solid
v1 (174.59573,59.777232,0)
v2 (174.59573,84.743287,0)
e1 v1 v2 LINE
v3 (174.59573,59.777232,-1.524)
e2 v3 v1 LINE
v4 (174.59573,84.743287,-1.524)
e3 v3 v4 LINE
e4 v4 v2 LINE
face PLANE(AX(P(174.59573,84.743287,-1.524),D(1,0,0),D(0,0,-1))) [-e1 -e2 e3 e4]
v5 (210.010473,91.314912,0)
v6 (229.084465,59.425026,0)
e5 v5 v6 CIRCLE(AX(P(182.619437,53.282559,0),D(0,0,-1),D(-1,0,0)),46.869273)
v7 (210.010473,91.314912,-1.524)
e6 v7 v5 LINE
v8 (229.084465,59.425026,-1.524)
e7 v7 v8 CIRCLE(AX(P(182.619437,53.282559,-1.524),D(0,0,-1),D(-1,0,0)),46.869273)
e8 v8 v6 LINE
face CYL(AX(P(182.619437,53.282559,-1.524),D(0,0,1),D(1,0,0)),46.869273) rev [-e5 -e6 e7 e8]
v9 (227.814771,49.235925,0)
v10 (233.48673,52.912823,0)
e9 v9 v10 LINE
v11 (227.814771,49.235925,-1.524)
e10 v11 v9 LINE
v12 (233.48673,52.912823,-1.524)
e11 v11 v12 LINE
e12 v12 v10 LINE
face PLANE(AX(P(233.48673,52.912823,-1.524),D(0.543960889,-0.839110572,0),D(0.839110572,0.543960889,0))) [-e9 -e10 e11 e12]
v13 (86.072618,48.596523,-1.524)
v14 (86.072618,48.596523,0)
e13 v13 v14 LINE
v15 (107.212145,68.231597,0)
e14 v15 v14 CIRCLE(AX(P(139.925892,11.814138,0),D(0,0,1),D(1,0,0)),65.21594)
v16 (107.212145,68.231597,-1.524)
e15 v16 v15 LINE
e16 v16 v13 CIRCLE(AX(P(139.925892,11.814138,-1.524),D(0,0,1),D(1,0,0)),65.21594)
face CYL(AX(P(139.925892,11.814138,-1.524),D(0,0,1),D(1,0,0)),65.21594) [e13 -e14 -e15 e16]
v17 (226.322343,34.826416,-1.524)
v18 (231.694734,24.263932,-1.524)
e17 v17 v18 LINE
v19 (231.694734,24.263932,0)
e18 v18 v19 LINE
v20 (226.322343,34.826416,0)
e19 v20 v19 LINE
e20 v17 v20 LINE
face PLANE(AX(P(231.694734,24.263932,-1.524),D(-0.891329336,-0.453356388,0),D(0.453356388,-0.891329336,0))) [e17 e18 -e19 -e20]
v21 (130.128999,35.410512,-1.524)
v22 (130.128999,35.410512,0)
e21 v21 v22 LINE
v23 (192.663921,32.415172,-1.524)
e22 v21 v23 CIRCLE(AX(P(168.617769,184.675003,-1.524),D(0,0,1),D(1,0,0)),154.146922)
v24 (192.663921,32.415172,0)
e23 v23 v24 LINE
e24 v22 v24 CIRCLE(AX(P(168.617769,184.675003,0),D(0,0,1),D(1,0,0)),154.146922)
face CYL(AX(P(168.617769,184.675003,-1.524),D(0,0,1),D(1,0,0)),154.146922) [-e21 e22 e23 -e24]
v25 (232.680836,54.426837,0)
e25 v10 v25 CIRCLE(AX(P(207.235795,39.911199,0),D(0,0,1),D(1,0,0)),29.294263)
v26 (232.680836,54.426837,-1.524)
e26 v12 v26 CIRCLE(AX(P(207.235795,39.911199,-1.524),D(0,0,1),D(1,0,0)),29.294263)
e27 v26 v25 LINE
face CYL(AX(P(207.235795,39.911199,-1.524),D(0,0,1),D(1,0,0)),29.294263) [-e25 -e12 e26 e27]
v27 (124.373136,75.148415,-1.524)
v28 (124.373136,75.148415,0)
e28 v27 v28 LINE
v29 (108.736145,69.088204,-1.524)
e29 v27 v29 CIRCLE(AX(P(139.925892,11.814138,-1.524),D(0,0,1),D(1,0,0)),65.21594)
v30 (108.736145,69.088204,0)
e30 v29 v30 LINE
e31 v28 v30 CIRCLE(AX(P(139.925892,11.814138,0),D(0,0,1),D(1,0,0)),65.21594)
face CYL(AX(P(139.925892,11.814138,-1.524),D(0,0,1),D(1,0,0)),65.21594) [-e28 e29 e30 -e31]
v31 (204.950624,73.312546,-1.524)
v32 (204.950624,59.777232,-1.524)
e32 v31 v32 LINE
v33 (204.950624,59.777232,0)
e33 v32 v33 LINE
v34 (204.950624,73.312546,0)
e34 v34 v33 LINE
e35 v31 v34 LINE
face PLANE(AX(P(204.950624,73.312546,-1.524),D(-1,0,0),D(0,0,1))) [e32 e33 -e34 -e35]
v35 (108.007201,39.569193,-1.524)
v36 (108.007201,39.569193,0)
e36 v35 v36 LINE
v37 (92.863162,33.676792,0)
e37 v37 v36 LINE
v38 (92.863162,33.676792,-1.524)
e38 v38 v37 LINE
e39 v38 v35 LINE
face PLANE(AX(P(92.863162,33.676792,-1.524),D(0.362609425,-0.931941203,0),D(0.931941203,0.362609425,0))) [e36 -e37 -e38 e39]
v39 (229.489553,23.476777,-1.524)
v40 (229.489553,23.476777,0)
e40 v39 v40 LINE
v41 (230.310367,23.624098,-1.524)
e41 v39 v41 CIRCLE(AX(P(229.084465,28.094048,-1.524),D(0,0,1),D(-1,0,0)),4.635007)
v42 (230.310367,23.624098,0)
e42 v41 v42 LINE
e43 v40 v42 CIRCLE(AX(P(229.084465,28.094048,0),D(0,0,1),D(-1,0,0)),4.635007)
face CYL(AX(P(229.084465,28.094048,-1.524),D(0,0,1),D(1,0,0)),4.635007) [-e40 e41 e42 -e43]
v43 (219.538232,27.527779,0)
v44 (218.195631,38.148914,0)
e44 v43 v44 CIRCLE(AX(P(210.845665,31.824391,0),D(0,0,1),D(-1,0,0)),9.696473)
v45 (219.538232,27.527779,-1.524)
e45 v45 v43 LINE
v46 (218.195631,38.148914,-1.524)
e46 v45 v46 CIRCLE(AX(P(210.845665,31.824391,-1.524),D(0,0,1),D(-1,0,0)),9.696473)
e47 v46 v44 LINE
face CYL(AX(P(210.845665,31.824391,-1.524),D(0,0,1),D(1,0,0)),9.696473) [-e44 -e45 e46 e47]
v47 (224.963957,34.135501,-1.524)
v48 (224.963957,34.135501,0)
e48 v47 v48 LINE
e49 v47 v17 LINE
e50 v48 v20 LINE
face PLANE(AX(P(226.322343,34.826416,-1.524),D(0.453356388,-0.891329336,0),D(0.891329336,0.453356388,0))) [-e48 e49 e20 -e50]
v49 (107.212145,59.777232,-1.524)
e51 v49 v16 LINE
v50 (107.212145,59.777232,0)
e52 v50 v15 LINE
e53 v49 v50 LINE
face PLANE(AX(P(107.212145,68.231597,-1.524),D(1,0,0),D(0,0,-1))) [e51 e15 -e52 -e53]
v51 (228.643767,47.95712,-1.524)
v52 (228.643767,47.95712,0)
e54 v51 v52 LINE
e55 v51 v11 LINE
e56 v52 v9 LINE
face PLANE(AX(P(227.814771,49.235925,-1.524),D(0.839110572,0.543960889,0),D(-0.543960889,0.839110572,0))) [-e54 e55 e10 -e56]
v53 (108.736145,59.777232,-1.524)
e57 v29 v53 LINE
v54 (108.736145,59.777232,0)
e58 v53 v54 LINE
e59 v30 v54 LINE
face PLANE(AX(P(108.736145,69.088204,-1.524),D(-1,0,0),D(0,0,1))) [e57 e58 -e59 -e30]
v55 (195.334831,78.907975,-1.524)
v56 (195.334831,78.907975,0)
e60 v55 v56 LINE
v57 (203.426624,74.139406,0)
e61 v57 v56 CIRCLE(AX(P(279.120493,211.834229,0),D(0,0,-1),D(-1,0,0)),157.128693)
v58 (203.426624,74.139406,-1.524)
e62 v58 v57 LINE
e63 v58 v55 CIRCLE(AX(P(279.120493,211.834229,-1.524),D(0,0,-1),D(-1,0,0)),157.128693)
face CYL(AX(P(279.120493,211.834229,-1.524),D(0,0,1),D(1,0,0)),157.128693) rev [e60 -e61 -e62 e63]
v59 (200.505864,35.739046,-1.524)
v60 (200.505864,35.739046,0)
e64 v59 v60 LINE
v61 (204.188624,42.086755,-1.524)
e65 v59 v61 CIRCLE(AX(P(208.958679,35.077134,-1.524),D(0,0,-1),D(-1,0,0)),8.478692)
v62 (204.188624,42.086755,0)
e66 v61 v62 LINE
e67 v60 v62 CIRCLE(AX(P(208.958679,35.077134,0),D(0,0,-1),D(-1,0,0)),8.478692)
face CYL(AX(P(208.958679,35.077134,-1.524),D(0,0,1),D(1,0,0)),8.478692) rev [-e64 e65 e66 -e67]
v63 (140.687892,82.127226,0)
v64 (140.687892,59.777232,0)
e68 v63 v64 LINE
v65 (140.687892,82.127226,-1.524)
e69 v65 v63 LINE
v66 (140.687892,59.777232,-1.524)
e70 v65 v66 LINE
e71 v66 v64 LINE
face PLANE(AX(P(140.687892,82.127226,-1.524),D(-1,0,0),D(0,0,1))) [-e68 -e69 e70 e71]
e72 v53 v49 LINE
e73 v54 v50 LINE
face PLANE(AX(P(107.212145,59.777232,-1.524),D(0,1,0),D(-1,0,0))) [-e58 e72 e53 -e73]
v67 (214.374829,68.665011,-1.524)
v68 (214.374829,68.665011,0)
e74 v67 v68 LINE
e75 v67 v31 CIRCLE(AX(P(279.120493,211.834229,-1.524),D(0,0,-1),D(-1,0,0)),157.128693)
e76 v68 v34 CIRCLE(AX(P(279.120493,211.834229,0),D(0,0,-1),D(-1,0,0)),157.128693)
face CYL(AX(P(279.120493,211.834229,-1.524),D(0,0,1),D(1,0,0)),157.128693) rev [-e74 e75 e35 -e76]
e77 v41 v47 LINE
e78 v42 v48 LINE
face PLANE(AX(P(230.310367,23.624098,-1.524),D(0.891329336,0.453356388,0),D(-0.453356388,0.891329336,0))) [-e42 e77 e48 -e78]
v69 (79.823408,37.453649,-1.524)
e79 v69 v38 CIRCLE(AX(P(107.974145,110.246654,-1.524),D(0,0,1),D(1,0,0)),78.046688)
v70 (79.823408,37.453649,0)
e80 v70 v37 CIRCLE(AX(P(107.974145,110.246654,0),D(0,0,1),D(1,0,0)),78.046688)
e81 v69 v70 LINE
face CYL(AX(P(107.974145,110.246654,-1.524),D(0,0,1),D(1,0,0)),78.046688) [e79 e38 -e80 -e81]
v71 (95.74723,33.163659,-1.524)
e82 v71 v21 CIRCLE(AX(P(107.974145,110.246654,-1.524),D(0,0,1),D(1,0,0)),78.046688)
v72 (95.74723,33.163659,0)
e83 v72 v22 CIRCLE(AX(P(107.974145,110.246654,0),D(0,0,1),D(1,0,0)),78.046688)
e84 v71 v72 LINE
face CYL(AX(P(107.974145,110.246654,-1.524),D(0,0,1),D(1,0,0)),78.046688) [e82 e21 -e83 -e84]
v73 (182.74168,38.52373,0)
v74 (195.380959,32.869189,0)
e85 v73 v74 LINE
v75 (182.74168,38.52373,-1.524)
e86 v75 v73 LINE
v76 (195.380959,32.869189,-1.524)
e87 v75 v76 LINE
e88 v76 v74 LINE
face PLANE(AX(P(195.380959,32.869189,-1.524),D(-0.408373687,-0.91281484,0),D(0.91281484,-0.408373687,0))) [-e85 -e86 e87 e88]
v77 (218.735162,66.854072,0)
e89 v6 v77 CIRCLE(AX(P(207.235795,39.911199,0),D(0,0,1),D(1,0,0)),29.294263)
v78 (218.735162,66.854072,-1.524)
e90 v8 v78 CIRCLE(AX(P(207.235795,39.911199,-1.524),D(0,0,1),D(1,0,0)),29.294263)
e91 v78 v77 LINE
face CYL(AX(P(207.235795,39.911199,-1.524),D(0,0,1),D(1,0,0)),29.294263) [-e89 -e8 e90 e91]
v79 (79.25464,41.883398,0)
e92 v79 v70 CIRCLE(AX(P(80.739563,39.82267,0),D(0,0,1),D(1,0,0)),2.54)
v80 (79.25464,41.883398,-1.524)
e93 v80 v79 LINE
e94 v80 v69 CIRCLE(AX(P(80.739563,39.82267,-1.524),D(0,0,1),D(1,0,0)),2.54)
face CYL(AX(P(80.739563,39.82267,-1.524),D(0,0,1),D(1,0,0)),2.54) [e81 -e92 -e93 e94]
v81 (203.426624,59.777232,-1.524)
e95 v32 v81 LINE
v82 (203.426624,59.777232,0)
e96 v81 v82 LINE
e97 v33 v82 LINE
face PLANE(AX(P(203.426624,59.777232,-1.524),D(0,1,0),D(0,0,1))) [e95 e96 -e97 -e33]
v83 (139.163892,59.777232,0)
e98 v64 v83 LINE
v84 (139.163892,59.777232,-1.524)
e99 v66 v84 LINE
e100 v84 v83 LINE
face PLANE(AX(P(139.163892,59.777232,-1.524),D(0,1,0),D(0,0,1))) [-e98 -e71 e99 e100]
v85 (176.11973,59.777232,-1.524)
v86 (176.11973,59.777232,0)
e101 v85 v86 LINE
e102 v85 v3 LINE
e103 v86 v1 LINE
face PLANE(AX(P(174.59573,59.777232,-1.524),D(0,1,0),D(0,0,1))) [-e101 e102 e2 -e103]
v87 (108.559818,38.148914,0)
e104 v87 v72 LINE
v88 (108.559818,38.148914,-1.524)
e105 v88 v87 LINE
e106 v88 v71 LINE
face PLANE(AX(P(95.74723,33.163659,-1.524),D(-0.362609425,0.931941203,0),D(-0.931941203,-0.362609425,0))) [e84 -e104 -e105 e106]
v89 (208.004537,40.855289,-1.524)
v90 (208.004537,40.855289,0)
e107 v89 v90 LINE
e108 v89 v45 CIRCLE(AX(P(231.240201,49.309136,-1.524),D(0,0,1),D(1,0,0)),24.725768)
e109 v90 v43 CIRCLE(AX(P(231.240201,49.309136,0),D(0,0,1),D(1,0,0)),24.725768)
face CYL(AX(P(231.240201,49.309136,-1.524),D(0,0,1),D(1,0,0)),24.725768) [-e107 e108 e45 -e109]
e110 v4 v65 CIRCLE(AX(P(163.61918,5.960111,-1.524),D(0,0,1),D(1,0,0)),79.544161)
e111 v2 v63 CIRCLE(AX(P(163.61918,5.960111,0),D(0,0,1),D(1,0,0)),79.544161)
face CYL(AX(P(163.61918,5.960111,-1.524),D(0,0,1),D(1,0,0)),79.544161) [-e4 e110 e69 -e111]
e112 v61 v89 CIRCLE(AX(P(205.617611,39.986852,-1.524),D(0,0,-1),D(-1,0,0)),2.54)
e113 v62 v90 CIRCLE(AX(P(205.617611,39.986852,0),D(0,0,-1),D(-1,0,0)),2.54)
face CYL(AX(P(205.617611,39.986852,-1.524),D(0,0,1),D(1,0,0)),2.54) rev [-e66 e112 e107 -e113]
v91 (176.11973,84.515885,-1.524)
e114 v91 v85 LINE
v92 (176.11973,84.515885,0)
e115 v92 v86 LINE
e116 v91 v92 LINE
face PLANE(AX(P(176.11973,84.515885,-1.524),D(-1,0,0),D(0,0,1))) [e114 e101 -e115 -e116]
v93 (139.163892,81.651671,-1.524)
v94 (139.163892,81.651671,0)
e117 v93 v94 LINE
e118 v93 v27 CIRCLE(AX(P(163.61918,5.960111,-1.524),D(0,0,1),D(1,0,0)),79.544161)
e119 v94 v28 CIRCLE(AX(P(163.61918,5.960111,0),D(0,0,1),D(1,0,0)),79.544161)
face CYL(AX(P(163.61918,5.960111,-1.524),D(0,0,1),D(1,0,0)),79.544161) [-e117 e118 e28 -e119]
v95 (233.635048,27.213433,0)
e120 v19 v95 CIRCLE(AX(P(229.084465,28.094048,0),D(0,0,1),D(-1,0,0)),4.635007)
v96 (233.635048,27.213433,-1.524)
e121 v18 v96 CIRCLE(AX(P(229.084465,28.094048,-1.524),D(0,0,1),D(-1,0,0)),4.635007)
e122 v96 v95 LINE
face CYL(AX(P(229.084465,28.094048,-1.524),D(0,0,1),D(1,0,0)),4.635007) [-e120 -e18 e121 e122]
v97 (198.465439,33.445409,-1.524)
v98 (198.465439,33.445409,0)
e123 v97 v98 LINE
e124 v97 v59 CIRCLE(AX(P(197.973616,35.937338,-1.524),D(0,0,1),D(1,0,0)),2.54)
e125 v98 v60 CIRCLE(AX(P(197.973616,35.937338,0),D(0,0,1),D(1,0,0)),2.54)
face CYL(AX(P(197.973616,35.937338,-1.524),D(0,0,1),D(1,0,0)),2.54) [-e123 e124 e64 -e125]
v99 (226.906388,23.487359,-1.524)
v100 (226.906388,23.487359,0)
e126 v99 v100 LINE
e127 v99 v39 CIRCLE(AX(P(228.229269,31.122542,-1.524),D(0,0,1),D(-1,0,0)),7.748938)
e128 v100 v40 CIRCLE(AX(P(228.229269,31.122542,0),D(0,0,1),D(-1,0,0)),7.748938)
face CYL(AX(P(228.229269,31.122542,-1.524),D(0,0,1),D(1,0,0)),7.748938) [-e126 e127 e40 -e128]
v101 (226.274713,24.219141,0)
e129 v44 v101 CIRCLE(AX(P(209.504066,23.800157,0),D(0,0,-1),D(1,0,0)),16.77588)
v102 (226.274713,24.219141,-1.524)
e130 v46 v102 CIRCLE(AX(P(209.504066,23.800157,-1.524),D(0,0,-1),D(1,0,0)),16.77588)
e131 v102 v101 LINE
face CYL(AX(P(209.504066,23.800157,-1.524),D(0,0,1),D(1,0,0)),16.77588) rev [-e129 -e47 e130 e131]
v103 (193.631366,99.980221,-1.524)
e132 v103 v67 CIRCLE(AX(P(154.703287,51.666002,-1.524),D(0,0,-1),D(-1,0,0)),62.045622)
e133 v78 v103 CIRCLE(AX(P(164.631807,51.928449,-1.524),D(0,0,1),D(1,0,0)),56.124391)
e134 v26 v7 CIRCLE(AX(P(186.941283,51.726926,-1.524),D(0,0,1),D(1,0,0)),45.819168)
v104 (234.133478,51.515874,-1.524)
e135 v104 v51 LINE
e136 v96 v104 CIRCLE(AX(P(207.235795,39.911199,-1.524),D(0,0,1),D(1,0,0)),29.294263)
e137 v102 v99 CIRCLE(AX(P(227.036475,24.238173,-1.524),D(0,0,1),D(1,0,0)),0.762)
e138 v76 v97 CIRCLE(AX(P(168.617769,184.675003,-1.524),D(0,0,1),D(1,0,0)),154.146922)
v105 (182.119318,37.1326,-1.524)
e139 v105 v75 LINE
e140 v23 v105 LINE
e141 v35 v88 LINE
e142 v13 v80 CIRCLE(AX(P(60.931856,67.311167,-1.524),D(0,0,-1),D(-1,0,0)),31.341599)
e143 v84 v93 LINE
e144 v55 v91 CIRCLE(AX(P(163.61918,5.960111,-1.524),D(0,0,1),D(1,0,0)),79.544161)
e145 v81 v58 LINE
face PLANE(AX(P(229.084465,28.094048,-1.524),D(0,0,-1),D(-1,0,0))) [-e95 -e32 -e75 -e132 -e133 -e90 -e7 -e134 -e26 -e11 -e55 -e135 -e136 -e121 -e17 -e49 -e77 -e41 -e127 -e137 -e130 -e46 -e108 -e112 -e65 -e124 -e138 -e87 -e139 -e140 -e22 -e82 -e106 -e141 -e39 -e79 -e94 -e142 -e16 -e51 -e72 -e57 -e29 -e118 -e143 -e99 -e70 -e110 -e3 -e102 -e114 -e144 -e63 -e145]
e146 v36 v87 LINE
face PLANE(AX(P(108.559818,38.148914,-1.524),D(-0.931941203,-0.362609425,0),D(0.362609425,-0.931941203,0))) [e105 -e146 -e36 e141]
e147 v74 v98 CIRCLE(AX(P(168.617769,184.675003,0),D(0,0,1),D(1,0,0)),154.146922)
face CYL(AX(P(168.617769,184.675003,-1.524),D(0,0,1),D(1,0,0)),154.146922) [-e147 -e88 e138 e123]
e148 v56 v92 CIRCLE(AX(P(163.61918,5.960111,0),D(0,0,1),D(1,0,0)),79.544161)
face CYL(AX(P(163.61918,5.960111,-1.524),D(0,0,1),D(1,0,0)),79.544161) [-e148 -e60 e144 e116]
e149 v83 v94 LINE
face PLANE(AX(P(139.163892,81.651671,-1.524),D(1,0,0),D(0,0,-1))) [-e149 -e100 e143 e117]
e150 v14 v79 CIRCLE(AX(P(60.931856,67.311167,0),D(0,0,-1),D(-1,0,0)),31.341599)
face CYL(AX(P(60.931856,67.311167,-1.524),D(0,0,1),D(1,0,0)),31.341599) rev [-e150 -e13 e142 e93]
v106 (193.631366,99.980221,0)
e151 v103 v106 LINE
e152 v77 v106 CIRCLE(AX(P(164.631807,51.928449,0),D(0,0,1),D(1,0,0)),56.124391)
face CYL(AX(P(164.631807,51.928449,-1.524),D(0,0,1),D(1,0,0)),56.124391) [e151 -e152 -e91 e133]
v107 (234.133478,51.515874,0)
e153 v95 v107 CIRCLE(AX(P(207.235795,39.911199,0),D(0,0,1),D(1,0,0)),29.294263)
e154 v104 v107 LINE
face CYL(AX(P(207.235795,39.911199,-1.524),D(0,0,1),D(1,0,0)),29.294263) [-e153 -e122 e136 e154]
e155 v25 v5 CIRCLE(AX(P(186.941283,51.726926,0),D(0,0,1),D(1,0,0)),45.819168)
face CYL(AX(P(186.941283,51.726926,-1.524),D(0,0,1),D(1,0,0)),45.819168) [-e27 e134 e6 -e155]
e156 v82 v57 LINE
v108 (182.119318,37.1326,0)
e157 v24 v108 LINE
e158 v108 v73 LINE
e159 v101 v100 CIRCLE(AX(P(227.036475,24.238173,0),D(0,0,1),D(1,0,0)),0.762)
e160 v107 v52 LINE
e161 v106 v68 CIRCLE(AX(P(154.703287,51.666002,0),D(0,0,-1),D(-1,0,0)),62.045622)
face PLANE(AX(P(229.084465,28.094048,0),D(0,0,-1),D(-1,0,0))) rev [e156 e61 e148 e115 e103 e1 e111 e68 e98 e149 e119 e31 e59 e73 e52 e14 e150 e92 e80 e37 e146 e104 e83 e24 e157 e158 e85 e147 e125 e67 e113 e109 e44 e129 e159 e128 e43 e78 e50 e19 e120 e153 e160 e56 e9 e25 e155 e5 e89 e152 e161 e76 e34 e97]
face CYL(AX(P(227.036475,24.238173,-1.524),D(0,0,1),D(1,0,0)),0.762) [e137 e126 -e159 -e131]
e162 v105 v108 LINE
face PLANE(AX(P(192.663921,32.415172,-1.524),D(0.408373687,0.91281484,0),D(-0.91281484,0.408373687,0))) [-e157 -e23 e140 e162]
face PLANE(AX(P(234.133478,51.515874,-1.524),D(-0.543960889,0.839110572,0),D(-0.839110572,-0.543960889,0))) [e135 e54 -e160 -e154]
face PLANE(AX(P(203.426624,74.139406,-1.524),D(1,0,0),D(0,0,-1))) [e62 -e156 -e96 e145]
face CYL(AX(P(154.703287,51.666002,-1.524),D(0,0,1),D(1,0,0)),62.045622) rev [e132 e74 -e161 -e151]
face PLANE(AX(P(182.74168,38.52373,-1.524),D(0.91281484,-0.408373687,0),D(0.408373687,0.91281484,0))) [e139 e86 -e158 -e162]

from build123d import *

# Parameters (mm, degrees)
BASE_FLANGE1_DEPTH = 1.524


# Sheet-metal steps are written as plain solids
with BuildPart() as part:
    # Sketch1 → Base-Flange1 (new body)
    with BuildSketch(Plane.XY):
        with BuildLine():
            Line((231.694733782, 24.263932463), (226.322343195, 34.826415896))
            Line((226.322343195, 34.826415896), (224.963957286, 34.135500761))
            Line((224.963957286, 34.135500761), (230.310366707, 23.62409806))
            ThreePointArc((230.310366707, 23.62409806), (229.903279587, 23.531939933), (229.489552508, 23.476777012))
            ThreePointArc((229.489552508, 23.476777012), (228.197526273, 23.373669283), (226.906388141, 23.487358857))
            ThreePointArc((226.906388141, 23.487358857), (226.4596517, 23.740258206), (226.274712745, 24.219141398))
            ThreePointArc((226.274712745, 24.219141398), (224.015809297, 32.216773888), (218.195630565, 38.14891429))
            ThreePointArc((218.195630565, 38.14891429), (220.465583992, 33.0404298), (219.538231847, 27.527778863))
            ThreePointArc((219.538231847, 27.527778863), (216.207783845, 29.677782654), (213.263726879, 32.332387856))
            ThreePointArc((213.263726879, 32.332387856), (210.198099549, 36.324777472), (208.004537358, 40.855288557))
            ThreePointArc((208.004537358, 40.855288557), (206.39770053, 42.404093827), (204.188624103, 42.08675537))
            ThreePointArc((204.188624103, 42.08675537), (201.624892341, 39.331988443), (200.505863828, 35.739045838))
            ThreePointArc((200.505863828, 35.739045838), (199.871363088, 34.249097505), (198.465439283, 33.445408832))
            ThreePointArc((198.465439283, 33.445408832), (196.924665159, 33.149450023), (195.38095855, 32.869188678))
            Line((195.38095855, 32.869188678), (182.741679906, 38.523729549))
            Line((182.741679906, 38.523729549), (182.119318407, 37.132599733))
            Line((182.119318407, 37.132599733), (192.663920738, 32.415171901))
            ThreePointArc((192.663920738, 32.415171901), (161.242789348, 30.704605569), (130.128998565, 35.41051229))
            ThreePointArc((130.128998565, 35.41051229), (113.063651794, 32.366088022), (95.747230087, 33.163658602))
            Line((95.747230087, 33.163658602), (108.559818137, 38.14891429))
            Line((108.559818137, 38.14891429), (108.007201374, 39.569192683))
            Line((108.007201374, 39.569192683), (92.863162197, 33.67679162))
            ThreePointArc((92.863162197, 33.67679162), (86.261009295, 35.281159538), (79.823408008, 37.453648673))
            ThreePointArc((79.823408008, 37.453648673), (78.22024482, 39.499195708), (79.254639852, 41.883398257))
            ThreePointArc((79.254639852, 41.883398257), (82.921318742, 44.978245875), (86.072618329, 48.596522643))
            ThreePointArc((86.072618329, 48.596522643), (95.542941515, 59.597739927), (107.212145233, 68.231596978))
            Line((107.212145233, 68.231596978), (107.212145233, 59.777231813))
            Line((107.212145233, 59.777231813), (108.736145233, 59.777231813))
            Line((108.736145233, 59.777231813), (108.736145233, 69.088203695))
            ThreePointArc((108.736145233, 69.088203695), (116.359031122, 72.623035129), (124.373136037, 75.148415287))
            ThreePointArc((124.373136037, 75.148415287), (131.602965043, 78.776561047), (139.163891612, 81.651671224))
            Line((139.163891612, 81.651671224), (139.163891612, 59.777231813))
            Line((139.163891612, 59.777231813), (140.687891612, 59.777231813))
            Line((140.687891612, 59.777231813), (140.687891612, 82.127226165))
            ThreePointArc((140.687891612, 82.127226165), (157.500365841, 85.268581792), (174.595729834, 84.743286803))
            Line((174.595729834, 84.743286803), (174.595729834, 59.777231813))
            Line((174.595729834, 59.777231813), (176.119729834, 59.777231813))
            Line((176.119729834, 59.777231813), (176.119729834, 84.515885394))
            ThreePointArc((176.119729834, 84.515885394), (185.904383104, 82.318759277), (195.334831423, 78.907975308))
            ThreePointArc((195.334831423, 78.907975308), (199.345089693, 76.463216465), (203.426624103, 74.139406221))
            Line((203.426624103, 74.139406221), (203.426624103, 59.777231813))
            Line((203.426624103, 59.777231813), (204.950624103, 59.777231813))
            Line((204.950624103, 59.777231813), (204.950624103, 73.312546377))
            ThreePointArc((204.950624103, 73.312546377), (209.623865484, 70.909977098), (214.374828712, 68.665011052))
            ThreePointArc((214.374828712, 68.665011052), (206.4297978, 85.930083199), (193.631366333, 99.980221435))
            ThreePointArc((193.631366333, 99.980221435), (209.362770136, 85.826652744), (218.735162472, 66.854071628))
            ThreePointArc((218.735162472, 66.854071628), (224.318551803, 63.708956455), (229.084465035, 59.425026374))
            ThreePointArc((229.084465035, 59.425026374), (222.842822588, 77.340987602), (210.010472895, 91.314912193))
            ThreePointArc((210.010472895, 91.314912193), (225.977718367, 75.717609631), (232.680835608, 54.426837112))
            ThreePointArc((232.680835608, 54.426837112), (233.094865862, 53.67572934), (233.486730489, 52.912823022))
            Line((233.486730489, 52.912823022), (227.814771071, 49.235924899))
            Line((227.814771071, 49.235924899), (228.643767466, 47.957120387))
            Line((228.643767466, 47.957120387), (234.133478106, 51.515874121))
            ThreePointArc((234.133478106, 51.515874121), (236.523898696, 39.310516196), (233.635048327, 27.213433234))
            ThreePointArc((233.635048327, 27.213433234), (232.956717504, 25.546706257), (231.694733782, 24.263932463))
        make_face()
    extrude(amount=-BASE_FLANGE1_DEPTH)


solid = part.part
